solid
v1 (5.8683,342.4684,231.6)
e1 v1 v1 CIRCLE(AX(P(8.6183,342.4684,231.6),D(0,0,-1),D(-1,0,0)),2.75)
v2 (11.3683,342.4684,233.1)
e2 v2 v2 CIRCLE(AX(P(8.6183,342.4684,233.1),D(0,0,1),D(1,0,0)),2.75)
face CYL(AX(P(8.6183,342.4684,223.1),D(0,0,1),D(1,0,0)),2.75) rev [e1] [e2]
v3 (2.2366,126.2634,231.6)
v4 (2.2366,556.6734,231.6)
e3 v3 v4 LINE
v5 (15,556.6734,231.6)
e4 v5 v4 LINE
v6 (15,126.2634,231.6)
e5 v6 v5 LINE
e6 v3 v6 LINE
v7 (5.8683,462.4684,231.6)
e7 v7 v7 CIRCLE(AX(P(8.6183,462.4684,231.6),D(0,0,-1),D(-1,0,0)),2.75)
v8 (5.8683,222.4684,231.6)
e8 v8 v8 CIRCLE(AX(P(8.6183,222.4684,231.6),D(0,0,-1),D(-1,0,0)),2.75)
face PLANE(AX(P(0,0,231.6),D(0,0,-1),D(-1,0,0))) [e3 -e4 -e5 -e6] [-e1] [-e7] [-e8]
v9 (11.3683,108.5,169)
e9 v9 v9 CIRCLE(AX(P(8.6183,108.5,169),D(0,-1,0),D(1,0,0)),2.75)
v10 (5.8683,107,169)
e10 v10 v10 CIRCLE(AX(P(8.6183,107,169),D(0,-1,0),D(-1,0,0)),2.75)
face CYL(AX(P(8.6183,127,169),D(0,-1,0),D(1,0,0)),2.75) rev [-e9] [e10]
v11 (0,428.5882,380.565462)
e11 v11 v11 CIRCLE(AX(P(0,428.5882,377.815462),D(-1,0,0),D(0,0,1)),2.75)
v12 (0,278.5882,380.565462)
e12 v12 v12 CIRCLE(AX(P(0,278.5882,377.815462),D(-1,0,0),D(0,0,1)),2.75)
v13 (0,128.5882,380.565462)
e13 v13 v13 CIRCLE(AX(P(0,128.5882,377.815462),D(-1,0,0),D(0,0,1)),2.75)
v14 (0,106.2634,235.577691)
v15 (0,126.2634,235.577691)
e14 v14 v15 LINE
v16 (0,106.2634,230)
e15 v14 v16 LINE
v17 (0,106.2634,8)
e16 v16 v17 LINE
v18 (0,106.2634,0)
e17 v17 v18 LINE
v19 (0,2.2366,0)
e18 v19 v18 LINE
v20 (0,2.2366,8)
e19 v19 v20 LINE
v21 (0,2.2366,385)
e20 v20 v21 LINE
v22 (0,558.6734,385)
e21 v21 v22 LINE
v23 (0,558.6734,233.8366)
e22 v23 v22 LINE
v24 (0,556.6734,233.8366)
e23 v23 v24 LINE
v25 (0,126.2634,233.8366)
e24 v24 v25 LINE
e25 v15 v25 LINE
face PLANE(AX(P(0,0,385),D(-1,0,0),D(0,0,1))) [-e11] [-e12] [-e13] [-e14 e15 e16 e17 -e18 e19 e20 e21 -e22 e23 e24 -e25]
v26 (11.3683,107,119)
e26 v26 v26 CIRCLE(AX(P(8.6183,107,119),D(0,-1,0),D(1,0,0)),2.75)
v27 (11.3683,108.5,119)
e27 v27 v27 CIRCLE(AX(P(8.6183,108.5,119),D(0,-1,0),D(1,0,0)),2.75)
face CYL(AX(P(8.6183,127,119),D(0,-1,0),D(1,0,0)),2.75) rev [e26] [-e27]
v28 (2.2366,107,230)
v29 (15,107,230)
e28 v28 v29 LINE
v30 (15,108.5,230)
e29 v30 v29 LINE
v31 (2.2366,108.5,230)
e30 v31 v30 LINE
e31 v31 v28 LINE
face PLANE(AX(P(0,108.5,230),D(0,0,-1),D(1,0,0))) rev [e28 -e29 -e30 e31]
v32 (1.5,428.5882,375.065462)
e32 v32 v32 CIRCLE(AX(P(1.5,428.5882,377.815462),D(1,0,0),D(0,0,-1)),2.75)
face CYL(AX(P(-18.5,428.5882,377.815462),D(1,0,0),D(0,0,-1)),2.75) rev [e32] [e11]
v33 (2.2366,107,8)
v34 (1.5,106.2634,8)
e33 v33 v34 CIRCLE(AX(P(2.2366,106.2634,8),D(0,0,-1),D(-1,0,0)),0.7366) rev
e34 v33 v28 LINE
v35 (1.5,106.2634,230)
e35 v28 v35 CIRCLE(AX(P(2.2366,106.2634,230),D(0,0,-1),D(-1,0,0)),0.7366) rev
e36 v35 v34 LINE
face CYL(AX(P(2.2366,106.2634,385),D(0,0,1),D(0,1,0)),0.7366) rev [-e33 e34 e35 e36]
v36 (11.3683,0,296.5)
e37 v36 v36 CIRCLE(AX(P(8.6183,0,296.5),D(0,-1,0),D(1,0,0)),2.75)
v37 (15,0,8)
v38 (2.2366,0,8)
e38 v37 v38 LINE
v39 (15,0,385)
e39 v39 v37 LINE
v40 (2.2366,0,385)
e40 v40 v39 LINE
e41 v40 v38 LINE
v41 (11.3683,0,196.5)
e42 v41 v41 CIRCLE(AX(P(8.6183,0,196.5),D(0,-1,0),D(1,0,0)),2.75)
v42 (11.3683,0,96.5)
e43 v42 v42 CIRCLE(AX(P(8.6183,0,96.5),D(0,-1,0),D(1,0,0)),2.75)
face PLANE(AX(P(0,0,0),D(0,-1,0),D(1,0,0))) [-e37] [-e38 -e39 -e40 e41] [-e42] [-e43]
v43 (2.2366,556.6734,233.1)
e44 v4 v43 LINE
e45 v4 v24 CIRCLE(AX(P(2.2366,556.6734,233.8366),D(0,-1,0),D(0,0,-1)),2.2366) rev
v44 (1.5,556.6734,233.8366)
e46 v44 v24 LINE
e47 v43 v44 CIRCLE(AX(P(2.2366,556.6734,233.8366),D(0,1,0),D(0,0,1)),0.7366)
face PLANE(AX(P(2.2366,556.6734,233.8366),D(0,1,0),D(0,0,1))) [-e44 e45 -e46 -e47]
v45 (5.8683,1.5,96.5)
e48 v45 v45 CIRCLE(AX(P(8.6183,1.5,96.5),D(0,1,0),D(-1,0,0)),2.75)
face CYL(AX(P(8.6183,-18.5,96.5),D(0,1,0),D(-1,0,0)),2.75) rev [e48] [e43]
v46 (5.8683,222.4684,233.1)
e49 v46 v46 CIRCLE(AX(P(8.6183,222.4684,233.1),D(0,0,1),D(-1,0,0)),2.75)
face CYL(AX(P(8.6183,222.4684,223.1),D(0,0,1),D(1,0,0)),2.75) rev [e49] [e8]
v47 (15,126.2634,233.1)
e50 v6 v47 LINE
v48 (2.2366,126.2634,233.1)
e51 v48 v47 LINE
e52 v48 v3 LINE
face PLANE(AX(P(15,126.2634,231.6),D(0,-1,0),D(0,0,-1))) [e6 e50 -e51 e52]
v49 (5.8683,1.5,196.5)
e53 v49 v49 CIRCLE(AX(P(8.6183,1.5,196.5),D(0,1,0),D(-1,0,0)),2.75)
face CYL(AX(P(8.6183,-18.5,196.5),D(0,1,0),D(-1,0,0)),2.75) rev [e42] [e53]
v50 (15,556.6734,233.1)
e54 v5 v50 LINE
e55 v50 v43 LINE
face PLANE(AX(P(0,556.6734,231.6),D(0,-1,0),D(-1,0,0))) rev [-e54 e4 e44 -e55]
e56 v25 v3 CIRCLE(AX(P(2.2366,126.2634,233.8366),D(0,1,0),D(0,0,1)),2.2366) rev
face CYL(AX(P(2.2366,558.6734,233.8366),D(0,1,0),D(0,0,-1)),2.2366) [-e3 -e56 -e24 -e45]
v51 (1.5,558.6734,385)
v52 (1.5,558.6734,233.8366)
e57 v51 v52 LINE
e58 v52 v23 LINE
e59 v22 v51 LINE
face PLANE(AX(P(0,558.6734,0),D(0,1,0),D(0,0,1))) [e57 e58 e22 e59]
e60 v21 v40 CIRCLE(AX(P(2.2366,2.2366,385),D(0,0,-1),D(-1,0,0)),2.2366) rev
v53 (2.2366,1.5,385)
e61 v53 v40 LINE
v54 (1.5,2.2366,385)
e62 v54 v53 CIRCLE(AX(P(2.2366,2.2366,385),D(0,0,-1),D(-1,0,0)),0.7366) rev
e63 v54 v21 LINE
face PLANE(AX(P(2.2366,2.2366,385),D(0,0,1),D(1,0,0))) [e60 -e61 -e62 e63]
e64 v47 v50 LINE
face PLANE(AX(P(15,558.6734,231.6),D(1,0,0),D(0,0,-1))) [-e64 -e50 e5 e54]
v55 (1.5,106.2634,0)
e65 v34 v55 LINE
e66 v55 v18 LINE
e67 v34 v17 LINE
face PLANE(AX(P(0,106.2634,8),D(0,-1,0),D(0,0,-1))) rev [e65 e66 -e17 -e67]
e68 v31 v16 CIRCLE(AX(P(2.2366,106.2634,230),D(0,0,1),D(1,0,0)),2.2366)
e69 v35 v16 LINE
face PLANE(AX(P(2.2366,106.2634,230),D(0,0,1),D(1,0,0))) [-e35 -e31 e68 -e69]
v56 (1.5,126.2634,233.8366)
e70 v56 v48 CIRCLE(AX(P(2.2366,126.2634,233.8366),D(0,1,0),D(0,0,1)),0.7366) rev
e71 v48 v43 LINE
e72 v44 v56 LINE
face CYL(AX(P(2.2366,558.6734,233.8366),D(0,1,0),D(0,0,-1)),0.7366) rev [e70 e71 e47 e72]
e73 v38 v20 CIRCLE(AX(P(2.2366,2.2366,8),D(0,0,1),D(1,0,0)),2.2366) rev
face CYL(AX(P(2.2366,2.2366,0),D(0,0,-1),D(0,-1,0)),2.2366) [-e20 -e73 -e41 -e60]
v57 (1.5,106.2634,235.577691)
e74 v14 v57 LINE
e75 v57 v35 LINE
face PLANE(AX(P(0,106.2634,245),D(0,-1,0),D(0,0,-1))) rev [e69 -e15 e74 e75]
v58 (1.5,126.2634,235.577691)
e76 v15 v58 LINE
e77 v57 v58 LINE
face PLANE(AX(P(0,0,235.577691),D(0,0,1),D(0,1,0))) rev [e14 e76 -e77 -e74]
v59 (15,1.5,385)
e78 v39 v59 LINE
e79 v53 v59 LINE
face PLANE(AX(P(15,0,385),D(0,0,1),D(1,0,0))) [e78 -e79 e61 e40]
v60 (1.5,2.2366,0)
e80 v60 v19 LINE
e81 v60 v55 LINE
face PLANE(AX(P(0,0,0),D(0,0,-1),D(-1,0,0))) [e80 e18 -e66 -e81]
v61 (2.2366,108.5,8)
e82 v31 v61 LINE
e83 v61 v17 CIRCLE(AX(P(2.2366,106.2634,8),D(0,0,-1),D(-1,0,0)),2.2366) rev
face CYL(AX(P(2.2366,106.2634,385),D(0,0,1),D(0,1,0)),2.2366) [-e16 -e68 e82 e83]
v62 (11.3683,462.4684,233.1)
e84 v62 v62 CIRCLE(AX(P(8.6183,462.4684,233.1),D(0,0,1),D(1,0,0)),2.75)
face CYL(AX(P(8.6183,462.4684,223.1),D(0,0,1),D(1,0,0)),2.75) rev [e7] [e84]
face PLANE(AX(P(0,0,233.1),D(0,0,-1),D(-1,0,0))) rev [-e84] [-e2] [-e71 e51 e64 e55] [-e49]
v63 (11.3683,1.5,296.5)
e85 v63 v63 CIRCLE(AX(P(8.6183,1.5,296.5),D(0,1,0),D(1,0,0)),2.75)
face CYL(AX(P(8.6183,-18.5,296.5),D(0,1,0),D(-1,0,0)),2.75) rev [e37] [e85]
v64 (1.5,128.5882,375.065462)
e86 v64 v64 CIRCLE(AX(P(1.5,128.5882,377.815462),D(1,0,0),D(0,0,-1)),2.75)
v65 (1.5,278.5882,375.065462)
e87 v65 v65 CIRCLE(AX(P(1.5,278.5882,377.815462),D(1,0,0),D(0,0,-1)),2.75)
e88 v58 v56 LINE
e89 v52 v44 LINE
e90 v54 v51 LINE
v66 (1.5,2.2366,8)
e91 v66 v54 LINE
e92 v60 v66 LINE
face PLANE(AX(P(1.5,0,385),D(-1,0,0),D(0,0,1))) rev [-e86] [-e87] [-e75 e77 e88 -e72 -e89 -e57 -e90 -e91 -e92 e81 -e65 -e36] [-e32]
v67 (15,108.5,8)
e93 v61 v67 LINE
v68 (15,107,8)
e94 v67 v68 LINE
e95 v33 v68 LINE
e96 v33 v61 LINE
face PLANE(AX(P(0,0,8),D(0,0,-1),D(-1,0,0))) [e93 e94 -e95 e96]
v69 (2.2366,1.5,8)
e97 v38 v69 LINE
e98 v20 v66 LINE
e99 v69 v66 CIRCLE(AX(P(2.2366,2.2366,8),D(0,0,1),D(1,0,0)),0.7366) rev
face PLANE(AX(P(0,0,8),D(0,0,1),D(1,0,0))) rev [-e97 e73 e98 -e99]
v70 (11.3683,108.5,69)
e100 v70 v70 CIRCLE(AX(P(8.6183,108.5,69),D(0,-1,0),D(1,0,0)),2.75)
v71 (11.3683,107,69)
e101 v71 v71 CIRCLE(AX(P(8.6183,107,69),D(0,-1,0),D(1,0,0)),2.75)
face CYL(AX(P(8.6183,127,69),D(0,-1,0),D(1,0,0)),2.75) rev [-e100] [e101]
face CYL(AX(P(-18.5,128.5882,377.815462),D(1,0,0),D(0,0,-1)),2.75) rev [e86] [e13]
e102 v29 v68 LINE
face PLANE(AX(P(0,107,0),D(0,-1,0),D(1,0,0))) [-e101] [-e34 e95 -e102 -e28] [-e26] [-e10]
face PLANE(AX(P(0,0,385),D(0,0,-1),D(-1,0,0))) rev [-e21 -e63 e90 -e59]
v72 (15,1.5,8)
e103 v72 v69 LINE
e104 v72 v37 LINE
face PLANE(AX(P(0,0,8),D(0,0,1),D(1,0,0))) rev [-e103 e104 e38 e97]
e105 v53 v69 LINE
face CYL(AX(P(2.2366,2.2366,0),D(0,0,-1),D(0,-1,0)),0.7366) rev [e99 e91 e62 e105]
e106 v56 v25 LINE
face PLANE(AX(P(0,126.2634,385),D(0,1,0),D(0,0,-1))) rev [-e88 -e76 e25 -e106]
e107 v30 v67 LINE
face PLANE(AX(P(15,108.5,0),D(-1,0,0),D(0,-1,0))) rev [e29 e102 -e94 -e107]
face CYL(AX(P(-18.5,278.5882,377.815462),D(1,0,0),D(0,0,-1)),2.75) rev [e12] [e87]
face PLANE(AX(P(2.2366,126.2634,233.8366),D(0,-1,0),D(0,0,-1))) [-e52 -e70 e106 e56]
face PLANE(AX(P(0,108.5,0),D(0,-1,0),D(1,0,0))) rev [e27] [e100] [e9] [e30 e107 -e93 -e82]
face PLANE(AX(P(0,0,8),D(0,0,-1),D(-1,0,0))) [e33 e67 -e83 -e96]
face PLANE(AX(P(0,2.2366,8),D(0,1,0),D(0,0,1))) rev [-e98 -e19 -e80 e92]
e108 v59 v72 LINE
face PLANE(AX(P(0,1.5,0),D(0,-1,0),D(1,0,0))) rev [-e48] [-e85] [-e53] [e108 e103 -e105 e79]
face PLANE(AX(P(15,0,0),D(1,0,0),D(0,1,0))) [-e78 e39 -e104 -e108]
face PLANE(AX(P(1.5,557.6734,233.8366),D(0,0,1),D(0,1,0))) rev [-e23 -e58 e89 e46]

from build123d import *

# Parameters (mm, degrees)
SKETCH_2_W                       = 1.5
SKETCH_2_H                       = 108.5
SM_BASE_FLANGE_1_DEPTH           = 385
SM_EDGE_FLANGE_2_STRIP_W         = 7.4732
SM_EDGE_FLANGE_2_STRIP_H         = 1.5
SM_EDGE_FLANGE_2_STRIP_CUT_DEPTH = 385
SM_EDGE_FLANGE_2_DEPTH           = 385
SKETCH_13_W                      = 19.831026495
SKETCH_13_H                      = 4.393295337
CUT_EXTRUDE_1_DEPTH              = 8
SM_EDGE_FLANGE_3_STRIP_W         = 7.4732
SM_EDGE_FLANGE_3_STRIP_H         = 1.5
SM_EDGE_FLANGE_3_STRIP_CUT_DEPTH = 385
SM_EDGE_FLANGE_3_DEPTH           = 385
SKETCH_18_W                      = 20.05650784
SKETCH_18_H                      = 5.183741357
CUT_EXTRUDE_2_DEPTH              = 8
SKETCH_19_W                      = 25.725423763
SKETCH_19_H                      = 11.342633063
CUT_EXTRUDE_3_DEPTH              = 140
SKETCH_20_W                      = 20.859346665
SKETCH_20_H                      = 6.188811882
CUT_EXTRUDE_4_DEPTH              = 15
SKETCH_21_W                      = 1.5
SKETCH_21_H                      = 153.4
EXTRUDE_1_DEPTH                  = 452.41
SKETCH_22_R                      = 2.75
CUT_EXTRUDE_5_DEPTH              = 20
SKETCH_23_R                      = 2.75
CUT_EXTRUDE_6_DEPTH              = 20
SKETCH_24_R                      = 2.75
CUT_EXTRUDE_7_DEPTH              = 20
SKETCH_28_W                      = 3.977690792
SKETCH_28_H                      = 20
CUT_EXTRUDE_8_DEPTH              = 10
SM_EDGE_FLANGE_5_STRIP_W         = 7.4732
SM_EDGE_FLANGE_5_STRIP_H         = 1.5
SM_EDGE_FLANGE_5_STRIP_CUT_DEPTH = 432.41
SM_EDGE_FLANGE_5_DEPTH           = 432.41
SKETCH_32_R                      = 2.75
CUT_EXTRUDE_9_DEPTH              = 10
CUT_EXTRUDE_START                = -2
CUT_EXTRUDE_10_DEPTH             = 2


# Read off the part's stored shape, not the designer's step: 切除-拉伸10
# Sheet-metal steps are written as plain solids
with BuildPart() as part:
    # Sketch 2 → 基体-法兰1 (new body)
    with BuildSketch(Plane.XY):
        with Locations((0.75, 54.25)):
            Rectangle(SKETCH_2_W, SKETCH_2_H)
    extrude(amount=SM_BASE_FLANGE_1_DEPTH)

    # 边线-法兰2 strip (across the edge) → 边线-法兰2 strip cut (cut)
    with BuildSketch(Plane(origin=(1.5, 0, 385), x_dir=(0, 1, 0), z_dir=(0, 0, -1))):
        with Locations((-1.5, -0.75)):
            Rectangle(SM_EDGE_FLANGE_2_STRIP_W, SM_EDGE_FLANGE_2_STRIP_H)
    extrude(amount=SM_EDGE_FLANGE_2_STRIP_CUT_DEPTH, mode=Mode.SUBTRACT)

    # 边线-法兰2 section (across the edge) → 边线-法兰2 (add)
    with BuildSketch(Plane(origin=(1.5, 0, 385), x_dir=(0, 1, 0), z_dir=(0, 0, -1))):
        with BuildLine():
            Line((0, 0.7366), (0, 13.5))
            Line((0, 13.5), (1.5, 13.5))
            Line((1.5, 13.5), (1.5, 0.7366))
            ThreePointArc((1.5, 0.7366), (1.715745145, 0.215745145), (2.2366, 0))
            Line((2.2366, 0), (2.2366, -1.5))
            ThreePointArc((2.2366, -1.5), (0.655084973, -0.844915027), (0, 0.7366))
        make_face()
    extrude(amount=SM_EDGE_FLANGE_2_DEPTH)

    # 草图13 → 切除-拉伸1 (cut)
    with BuildSketch(Plane(origin=(0, 0, 0), x_dir=(-1, 0, 0), z_dir=(0, 0, -1))):
        with Locations((-9.915513247, 0.039952332)):
            Rectangle(SKETCH_13_W, SKETCH_13_H)
    extrude(amount=-CUT_EXTRUDE_1_DEPTH, mode=Mode.SUBTRACT)

    # 边线-法兰3 strip (across the edge) → 边线-法兰3 strip cut (cut)
    with BuildSketch(Plane(origin=(1.5, 108.5, 0), x_dir=(0, -1, 0), z_dir=(0, 0, 1))):
        with Locations((-1.5, -0.75)):
            Rectangle(SM_EDGE_FLANGE_3_STRIP_W, SM_EDGE_FLANGE_3_STRIP_H)
    extrude(amount=SM_EDGE_FLANGE_3_STRIP_CUT_DEPTH, mode=Mode.SUBTRACT)

    # 边线-法兰3 section (across the edge) → 边线-法兰3 (add)
    with BuildSketch(Plane(origin=(1.5, 108.5, 0), x_dir=(0, -1, 0), z_dir=(0, 0, 1))):
        with BuildLine():
            Line((0, 0.7366), (0, 13.5))
            Line((0, 13.5), (1.5, 13.5))
            Line((1.5, 13.5), (1.5, 0.7366))
            ThreePointArc((1.5, 0.7366), (1.715745145, 0.215745145), (2.2366, 0))
            Line((2.2366, 0), (2.2366, -1.5))
            ThreePointArc((2.2366, -1.5), (0.655084973, -0.844915027), (0, 0.7366))
        make_face()
    extrude(amount=SM_EDGE_FLANGE_3_DEPTH)

    # 草图18 → 切除-拉伸2 (cut)
    with BuildSketch(Plane(origin=(0, 0, 0), x_dir=(-1, 0, 0), z_dir=(0, 0, -1))):
        with Locations((-10.02825392, 108.855270679)):
            Rectangle(SKETCH_18_W, SKETCH_18_H)
    extrude(amount=-CUT_EXTRUDE_2_DEPTH, mode=Mode.SUBTRACT)

    # 草图19 → 切除-拉伸3 (cut)
    with BuildSketch(Plane.XY.offset(385)):
        with Locations((12.862711882, 111.934716532)):
            Rectangle(SKETCH_19_W, SKETCH_19_H)
    extrude(amount=-CUT_EXTRUDE_3_DEPTH, mode=Mode.SUBTRACT)

    # 草图20 → 切除-拉伸4 (cut)
    with BuildSketch(Plane.XY.offset(245)):
        with Locations((10.429673333, 109.357805941)):
            Rectangle(SKETCH_20_W, SKETCH_20_H)
    extrude(amount=-CUT_EXTRUDE_4_DEPTH, mode=Mode.SUBTRACT)

    # 草图21 → 凸台-拉伸1 (add)
    with BuildSketch(Plane(origin=(0, 106.2634, 0), x_dir=(1, 0, 0), z_dir=(0, 1, 0))):
        with Locations((0.75, -308.3)):
            Rectangle(SKETCH_21_W, SKETCH_21_H)
    extrude(amount=EXTRUDE_1_DEPTH)

    # 草图22 → 切除-拉伸5 (cut)
    with BuildSketch(Plane.XZ.offset(-107)):
        with Locations((8.6183, 69)):
            Circle(SKETCH_22_R)
        with Locations((8.6183, 169)):
            Circle(SKETCH_22_R)
        with Locations((8.6183, 119)):
            Circle(SKETCH_22_R)
    extrude(amount=-CUT_EXTRUDE_5_DEPTH, mode=Mode.SUBTRACT)

    # 草图23 → 切除-拉伸6 (cut)
    with BuildSketch(Plane(origin=(0, 1.5, 0), x_dir=(1, 0, 0), z_dir=(0, 1, 0))):
        with Locations(Location((8.6183, -96.5, 0), (0, 0, 180))):
            Circle(SKETCH_23_R)
        with Locations(Location((8.6183, -196.5, 0), (0, 0, 180))):
            Circle(SKETCH_23_R)
        with Locations((8.6183, -296.5)):
            Circle(SKETCH_23_R)
    extrude(amount=-CUT_EXTRUDE_6_DEPTH, mode=Mode.SUBTRACT)

    # 草图24 → 切除-拉伸7 (cut)
    with BuildSketch(Plane(origin=(1.5, 0, 0), x_dir=(0, 0, -1), z_dir=(1, 0, 0))):
        with Locations((-377.815462169, 128.5882)):
            Circle(SKETCH_24_R)
        with Locations((-377.815462169, 278.5882)):
            Circle(SKETCH_24_R)
        with Locations((-377.815462169, 428.5882)):
            Circle(SKETCH_24_R)
    extrude(amount=-CUT_EXTRUDE_7_DEPTH, mode=Mode.SUBTRACT)

    # 草图28 → 切除-拉伸8 (cut)
    with BuildSketch(Plane(origin=(1.5, 0, 0), x_dir=(0, 0, -1), z_dir=(1, 0, 0))):
        with Locations((-233.588845396, 116.2634)):
            Rectangle(SKETCH_28_W, SKETCH_28_H)
    extrude(amount=-CUT_EXTRUDE_8_DEPTH, mode=Mode.SUBTRACT)

    # 边线-法兰5 strip (across the edge) → 边线-法兰5 strip cut (cut)
    with BuildSketch(Plane(origin=(1.5, 126.2634, 231.6), x_dir=(0, 0, 1), z_dir=(0, 1, 0))):
        with Locations((-1.5, -0.75)):
            Rectangle(SM_EDGE_FLANGE_5_STRIP_W, SM_EDGE_FLANGE_5_STRIP_H)
    extrude(amount=SM_EDGE_FLANGE_5_STRIP_CUT_DEPTH, mode=Mode.SUBTRACT)

    # 边线-法兰5 section (across the edge) → 边线-法兰5 (add)
    with BuildSketch(Plane(origin=(1.5, 126.2634, 231.6), x_dir=(0, 0, 1), z_dir=(0, 1, 0))):
        with BuildLine():
            Line((0, 0.7366), (0, 13.5))
            Line((0, 13.5), (1.5, 13.5))
            Line((1.5, 13.5), (1.5, 0.7366))
            ThreePointArc((1.5, 0.7366), (1.715745145, 0.215745145), (2.2366, 0))
            Line((2.2366, 0), (2.2366, -1.5))
            ThreePointArc((2.2366, -1.5), (0.655084973, -0.844915027), (0, 0.7366))
        make_face()
    extrude(amount=SM_EDGE_FLANGE_5_DEPTH)

    # 草图32 → 切除-拉伸9 (cut)
    with BuildSketch(Plane.XY.offset(233.1)):
        with Locations((8.6183, 462.4684)):
            Circle(SKETCH_32_R)
        with Locations((8.6183, 342.4684)):
            Circle(SKETCH_32_R)
        with Locations(Location((8.6183, 222.4684, 0), (0, 0, 180))):
            Circle(SKETCH_32_R)
    extrude(amount=-CUT_EXTRUDE_9_DEPTH, mode=Mode.SUBTRACT)

    # 切除-拉伸10 outline → 切除-拉伸10 (cut)
    with BuildSketch(Plane(origin=(0, 558.6734, 0), x_dir=(1, 0, 0), z_dir=(0, 1, 0)).offset(CUT_EXTRUDE_START)):
        with BuildLine():
            ThreePointArc((2.2366, -231.6), (0.655084973, -232.255084973), (0, -233.8366))
            Line((0, -233.8366), (1.5, -233.8366))
            ThreePointArc((1.5, -233.8366), (1.715745145, -233.315745145), (2.2366, -233.1))
            Line((2.2366, -233.1), (15, -233.1))
            Line((15, -233.1), (15, -231.6))
            Line((15, -231.6), (2.2366, -231.6))
        make_face()
    extrude(amount=CUT_EXTRUDE_10_DEPTH, mode=Mode.SUBTRACT)


solid = part.part
